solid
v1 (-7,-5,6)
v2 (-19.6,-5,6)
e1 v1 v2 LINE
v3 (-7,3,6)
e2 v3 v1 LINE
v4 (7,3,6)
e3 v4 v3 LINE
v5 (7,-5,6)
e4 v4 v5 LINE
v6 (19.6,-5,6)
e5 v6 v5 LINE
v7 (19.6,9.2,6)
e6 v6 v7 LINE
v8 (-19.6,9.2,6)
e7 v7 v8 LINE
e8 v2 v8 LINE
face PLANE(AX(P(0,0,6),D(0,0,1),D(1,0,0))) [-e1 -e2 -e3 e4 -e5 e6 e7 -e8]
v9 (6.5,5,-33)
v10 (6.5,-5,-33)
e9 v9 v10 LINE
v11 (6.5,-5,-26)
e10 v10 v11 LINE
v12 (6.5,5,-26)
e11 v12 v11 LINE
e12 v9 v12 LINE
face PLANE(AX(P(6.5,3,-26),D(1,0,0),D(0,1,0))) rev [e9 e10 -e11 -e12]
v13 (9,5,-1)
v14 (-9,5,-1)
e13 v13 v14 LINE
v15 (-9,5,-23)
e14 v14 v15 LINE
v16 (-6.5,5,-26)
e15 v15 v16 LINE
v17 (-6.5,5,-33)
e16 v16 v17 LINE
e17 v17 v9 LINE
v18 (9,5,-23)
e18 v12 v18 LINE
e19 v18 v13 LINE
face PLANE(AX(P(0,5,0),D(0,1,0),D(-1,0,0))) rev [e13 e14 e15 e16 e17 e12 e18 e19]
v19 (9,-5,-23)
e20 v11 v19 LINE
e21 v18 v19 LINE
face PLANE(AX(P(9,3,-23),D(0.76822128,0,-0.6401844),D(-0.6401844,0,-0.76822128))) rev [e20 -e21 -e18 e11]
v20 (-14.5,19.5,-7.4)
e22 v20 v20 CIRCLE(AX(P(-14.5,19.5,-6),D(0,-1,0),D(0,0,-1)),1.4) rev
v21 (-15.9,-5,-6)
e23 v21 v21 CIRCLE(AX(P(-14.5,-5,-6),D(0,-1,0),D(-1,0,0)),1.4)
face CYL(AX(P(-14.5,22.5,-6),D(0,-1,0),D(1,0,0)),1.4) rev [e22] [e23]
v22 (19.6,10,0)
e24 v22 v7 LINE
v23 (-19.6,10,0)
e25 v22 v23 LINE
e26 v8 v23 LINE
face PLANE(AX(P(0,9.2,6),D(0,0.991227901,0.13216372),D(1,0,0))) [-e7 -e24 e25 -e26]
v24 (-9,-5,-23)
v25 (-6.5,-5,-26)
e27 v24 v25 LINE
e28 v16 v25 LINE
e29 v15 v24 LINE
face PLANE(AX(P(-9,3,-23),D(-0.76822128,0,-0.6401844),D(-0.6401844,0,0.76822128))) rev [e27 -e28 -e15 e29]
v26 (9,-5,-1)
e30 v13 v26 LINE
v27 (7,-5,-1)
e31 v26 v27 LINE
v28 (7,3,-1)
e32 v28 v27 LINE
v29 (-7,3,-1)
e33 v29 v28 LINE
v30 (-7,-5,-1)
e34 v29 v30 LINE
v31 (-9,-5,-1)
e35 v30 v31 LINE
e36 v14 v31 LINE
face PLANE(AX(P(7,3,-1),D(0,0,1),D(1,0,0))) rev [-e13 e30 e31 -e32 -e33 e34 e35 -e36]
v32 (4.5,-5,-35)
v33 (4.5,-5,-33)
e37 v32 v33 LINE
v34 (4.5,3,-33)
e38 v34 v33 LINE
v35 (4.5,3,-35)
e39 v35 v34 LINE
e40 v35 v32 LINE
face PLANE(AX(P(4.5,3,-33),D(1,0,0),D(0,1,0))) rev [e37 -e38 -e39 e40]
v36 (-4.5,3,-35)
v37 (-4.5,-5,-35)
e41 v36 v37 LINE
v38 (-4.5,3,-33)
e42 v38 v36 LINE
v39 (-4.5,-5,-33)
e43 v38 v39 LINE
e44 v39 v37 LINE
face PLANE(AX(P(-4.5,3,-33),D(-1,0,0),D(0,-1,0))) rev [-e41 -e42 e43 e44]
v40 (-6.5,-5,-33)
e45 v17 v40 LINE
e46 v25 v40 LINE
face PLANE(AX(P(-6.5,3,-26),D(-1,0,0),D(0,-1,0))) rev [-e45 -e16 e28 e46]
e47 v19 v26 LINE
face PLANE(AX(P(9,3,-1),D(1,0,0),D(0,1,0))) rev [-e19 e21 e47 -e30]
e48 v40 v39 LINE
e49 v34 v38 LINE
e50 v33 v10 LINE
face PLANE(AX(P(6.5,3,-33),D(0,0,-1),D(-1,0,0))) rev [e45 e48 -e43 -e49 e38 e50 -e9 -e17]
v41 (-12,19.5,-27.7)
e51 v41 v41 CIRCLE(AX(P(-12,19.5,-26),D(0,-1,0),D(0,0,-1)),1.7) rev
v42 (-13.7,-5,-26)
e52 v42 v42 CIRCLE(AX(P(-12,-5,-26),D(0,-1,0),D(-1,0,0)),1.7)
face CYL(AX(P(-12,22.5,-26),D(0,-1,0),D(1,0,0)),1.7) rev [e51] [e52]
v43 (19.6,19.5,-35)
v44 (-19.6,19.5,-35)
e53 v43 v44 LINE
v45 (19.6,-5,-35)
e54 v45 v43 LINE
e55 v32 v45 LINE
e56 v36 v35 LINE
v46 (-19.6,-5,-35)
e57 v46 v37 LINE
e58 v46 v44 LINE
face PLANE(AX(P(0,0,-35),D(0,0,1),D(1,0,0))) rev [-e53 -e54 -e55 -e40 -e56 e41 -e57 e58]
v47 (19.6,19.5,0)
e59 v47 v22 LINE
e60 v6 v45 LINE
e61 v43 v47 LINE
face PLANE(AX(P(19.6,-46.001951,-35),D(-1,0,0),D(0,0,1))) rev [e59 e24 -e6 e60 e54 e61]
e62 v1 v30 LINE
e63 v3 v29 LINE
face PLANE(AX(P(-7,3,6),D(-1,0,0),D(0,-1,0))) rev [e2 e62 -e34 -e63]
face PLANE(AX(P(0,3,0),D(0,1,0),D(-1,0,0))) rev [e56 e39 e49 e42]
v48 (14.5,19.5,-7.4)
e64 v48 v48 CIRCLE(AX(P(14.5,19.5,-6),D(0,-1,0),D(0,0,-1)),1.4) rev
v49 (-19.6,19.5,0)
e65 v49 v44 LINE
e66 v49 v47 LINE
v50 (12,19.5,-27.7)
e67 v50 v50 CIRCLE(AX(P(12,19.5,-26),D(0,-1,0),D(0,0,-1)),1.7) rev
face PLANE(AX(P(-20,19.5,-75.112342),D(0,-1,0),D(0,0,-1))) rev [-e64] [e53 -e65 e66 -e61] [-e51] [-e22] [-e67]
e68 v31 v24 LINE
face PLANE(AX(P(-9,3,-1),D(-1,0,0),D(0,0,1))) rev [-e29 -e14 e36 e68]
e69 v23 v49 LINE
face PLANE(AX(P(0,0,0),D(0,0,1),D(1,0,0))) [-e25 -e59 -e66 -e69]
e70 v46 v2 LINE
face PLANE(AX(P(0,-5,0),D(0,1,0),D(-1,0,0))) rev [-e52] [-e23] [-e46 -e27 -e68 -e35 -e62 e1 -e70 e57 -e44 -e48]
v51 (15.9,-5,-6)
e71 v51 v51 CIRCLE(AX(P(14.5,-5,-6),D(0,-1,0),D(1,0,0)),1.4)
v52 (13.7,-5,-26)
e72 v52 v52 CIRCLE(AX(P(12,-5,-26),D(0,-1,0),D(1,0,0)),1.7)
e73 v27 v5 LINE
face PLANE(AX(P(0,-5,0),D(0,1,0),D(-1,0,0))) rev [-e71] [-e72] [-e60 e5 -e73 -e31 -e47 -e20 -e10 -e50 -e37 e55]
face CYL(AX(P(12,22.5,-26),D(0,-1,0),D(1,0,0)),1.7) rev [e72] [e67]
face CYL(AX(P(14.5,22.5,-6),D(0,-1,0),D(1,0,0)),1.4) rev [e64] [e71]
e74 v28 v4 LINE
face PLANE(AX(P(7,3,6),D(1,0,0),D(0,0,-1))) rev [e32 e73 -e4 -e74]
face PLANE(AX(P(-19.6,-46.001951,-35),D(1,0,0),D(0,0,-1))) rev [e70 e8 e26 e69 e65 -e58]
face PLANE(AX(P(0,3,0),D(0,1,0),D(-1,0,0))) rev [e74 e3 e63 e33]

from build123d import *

# Parameters (mm, degrees)
SKETCH_1_W          = 40
SKETCH_1_H          = 20
EXTRUDE_1_DEPTH     = 6
SKETCH_2_W          = 40
SKETCH_2_H          = 32.5
EXTRUDE_2_DEPTH     = 35
CUT_EXTRUDE_1_DEPTH = 13
CUT_EXTRUDE_2_DEPTH = 2
SKETCH_6_W          = 40
SKETCH_6_H          = 41
CUT_EXTRUDE_3_DEPTH = 5
SKETCH_8_R          = 1.7
SKETCH_8_R_2        = 1.4
CUT_EXTRUDE_4_DEPTH = 49.79805324
CUT_EXTRUDE_5_REACH = 48.165
SKETCH_9_W          = 40
SKETCH_9_H          = 3
CHAMFER_1_SIZE2     = 6
CHAMFER_1_SIZE      = 0.8
CUT_EXTRUDE_6_REACH = 49.173
SKETCH_11_W         = 0.4
SKETCH_11_H         = 41


with BuildPart() as part:
    # Эскиз1 → Бобышка-Вытянуть1 (new body)
    with BuildSketch(Plane.XY):
        Rectangle(SKETCH_1_W, SKETCH_1_H)
    extrude(amount=EXTRUDE_1_DEPTH)

    # Эскиз2 → Бобышка-Вытянуть2 (add)
    with BuildSketch(Plane(origin=(0, 0, 0), x_dir=(-1, 0, 0), z_dir=(0, 0, -1))):
        with Locations((0, 6.25)):
            Rectangle(SKETCH_2_W, SKETCH_2_H)
    extrude(amount=EXTRUDE_2_DEPTH)

    # Эскиз3 → Вырез-Вытянуть1 (cut)
    with BuildSketch(Plane.XZ.offset(10)):
        Polygon((-7, 6), (-7, -1), (-9, -1), (-9, -23), (-6.5, -26), (-6.5, -33), (-4.5, -33), (-4.5, -35), (4.5, -35), (4.5, -33), (6.5, -33), (6.5, -26), (9, -23), (9, -1), (7, -1), (7, 6), align=None)
    extrude(amount=-CUT_EXTRUDE_1_DEPTH, mode=Mode.SUBTRACT)

    # Эскиз5 → Вырез-Вытянуть2 (cut)
    with BuildSketch(Plane.XZ.offset(-3)):
        Polygon((-9, -1), (9, -1), (9, -23), (6.5, -26), (6.5, -33), (-6.5, -33), (-6.5, -26), (-9, -23), align=None)
    extrude(amount=-CUT_EXTRUDE_2_DEPTH, mode=Mode.SUBTRACT)

    # Эскиз6 → Вырез-Вытянуть3 (cut)
    with BuildSketch(Plane.XZ.offset(10)):
        with Locations((0, -14.5)):
            Rectangle(SKETCH_6_W, SKETCH_6_H)
    extrude(amount=-CUT_EXTRUDE_3_DEPTH, mode=Mode.SUBTRACT)

    # Эскиз8 → Вырез-Вытянуть4 (cut, through all)
    with BuildSketch(Plane.XZ.offset(5)):
        with Locations((12, -26)):
            Circle(SKETCH_8_R)
        with Locations((14.5, -6)):
            Circle(SKETCH_8_R_2)
        with Locations(Location((-12, -26, 0), (0, 0, 180))):
            Circle(SKETCH_8_R)
        with Locations(Location((-14.5, -6, 0), (0, 0, 180))):
            Circle(SKETCH_8_R_2)
    extrude(amount=-CUT_EXTRUDE_4_DEPTH, mode=Mode.SUBTRACT)

    # Вырез-Вытянуть5: up to this face of the body (flat: up to its plane)
    cut_extrude_5_end = Plane(part.part.faces().sort_by_distance((0, 9.432879377, -35))[0])
    # Эскиз9 → Вырез-Вытянуть5 (cut, up to the picked face)
    with BuildSketch(Plane.XY, mode=Mode.PRIVATE) as cut_extrude_5_sk1:
        with Locations((0, 21)):
            Rectangle(SKETCH_9_W, SKETCH_9_H)
    cut_extrude_5_tool1 = split(extrude(cut_extrude_5_sk1.sketch, amount=-CUT_EXTRUDE_5_REACH, mode=Mode.PRIVATE), bisect_by=cut_extrude_5_end, keep=Keep.BOTH, mode=Mode.PRIVATE)
    add(cut_extrude_5_tool1.solids().sort_by(Axis((0, 21, 0), (0, 0, -1)))[0], mode=Mode.SUBTRACT)

    # Фаска1
    chamfer_1_edges = [part.edges().sort_by_distance(p)[0] for p in [
        (0, 10, 6),
    ]]
    chamfer_1_side = [part.faces().sort_by_distance(p)[0] for p in [
        (0, 9.984, 6),
    ]]
    chamfer(chamfer_1_edges, length=CHAMFER_1_SIZE - 0.0001, length2=CHAMFER_1_SIZE2 - 0.0001, reference=chamfer_1_side[0])  # a hair under: the kernel refuses the full size

    # Вырез-Вытянуть6: up to this face of the body (flat: up to its plane)
    cut_extrude_6_end = Plane(part.part.faces().sort_by_distance((13.916834893, -5, -14.890204003))[0])
    # Эскиз11 → Вырез-Вытянуть6 (cut, up to the picked face)
    with BuildSketch(Plane(origin=(0, 19.5, 0), x_dir=(1, 0, 0), z_dir=(0, 1, 0)), mode=Mode.PRIVATE) as cut_extrude_6_sk1:
        with Locations((-19.8, 14.5)):
            Rectangle(SKETCH_11_W, SKETCH_11_H)
    cut_extrude_6_tool1 = split(extrude(cut_extrude_6_sk1.sketch, amount=-CUT_EXTRUDE_6_REACH, mode=Mode.PRIVATE), bisect_by=cut_extrude_6_end, keep=Keep.BOTH, mode=Mode.PRIVATE)
    # Эскиз11 → Вырез-Вытянуть6 (cut, up to the picked face)
    with BuildSketch(Plane(origin=(0, 19.5, 0), x_dir=(1, 0, 0), z_dir=(0, 1, 0)), mode=Mode.PRIVATE) as cut_extrude_6_sk2:
        with Locations((19.8, 14.5)):
            Rectangle(SKETCH_11_W, SKETCH_11_H)
    cut_extrude_6_tool2 = split(extrude(cut_extrude_6_sk2.sketch, amount=-CUT_EXTRUDE_6_REACH, mode=Mode.PRIVATE), bisect_by=cut_extrude_6_end, keep=Keep.BOTH, mode=Mode.PRIVATE)
    add(cut_extrude_6_tool1.solids().sort_by(Axis((-19.8, 19.5, -14.5), (0, -1, 0)))[0], mode=Mode.SUBTRACT)
    add(cut_extrude_6_tool2.solids().sort_by(Axis((19.8, 19.5, -14.5), (0, -1, 0)))[0], mode=Mode.SUBTRACT)


solid = part.part
